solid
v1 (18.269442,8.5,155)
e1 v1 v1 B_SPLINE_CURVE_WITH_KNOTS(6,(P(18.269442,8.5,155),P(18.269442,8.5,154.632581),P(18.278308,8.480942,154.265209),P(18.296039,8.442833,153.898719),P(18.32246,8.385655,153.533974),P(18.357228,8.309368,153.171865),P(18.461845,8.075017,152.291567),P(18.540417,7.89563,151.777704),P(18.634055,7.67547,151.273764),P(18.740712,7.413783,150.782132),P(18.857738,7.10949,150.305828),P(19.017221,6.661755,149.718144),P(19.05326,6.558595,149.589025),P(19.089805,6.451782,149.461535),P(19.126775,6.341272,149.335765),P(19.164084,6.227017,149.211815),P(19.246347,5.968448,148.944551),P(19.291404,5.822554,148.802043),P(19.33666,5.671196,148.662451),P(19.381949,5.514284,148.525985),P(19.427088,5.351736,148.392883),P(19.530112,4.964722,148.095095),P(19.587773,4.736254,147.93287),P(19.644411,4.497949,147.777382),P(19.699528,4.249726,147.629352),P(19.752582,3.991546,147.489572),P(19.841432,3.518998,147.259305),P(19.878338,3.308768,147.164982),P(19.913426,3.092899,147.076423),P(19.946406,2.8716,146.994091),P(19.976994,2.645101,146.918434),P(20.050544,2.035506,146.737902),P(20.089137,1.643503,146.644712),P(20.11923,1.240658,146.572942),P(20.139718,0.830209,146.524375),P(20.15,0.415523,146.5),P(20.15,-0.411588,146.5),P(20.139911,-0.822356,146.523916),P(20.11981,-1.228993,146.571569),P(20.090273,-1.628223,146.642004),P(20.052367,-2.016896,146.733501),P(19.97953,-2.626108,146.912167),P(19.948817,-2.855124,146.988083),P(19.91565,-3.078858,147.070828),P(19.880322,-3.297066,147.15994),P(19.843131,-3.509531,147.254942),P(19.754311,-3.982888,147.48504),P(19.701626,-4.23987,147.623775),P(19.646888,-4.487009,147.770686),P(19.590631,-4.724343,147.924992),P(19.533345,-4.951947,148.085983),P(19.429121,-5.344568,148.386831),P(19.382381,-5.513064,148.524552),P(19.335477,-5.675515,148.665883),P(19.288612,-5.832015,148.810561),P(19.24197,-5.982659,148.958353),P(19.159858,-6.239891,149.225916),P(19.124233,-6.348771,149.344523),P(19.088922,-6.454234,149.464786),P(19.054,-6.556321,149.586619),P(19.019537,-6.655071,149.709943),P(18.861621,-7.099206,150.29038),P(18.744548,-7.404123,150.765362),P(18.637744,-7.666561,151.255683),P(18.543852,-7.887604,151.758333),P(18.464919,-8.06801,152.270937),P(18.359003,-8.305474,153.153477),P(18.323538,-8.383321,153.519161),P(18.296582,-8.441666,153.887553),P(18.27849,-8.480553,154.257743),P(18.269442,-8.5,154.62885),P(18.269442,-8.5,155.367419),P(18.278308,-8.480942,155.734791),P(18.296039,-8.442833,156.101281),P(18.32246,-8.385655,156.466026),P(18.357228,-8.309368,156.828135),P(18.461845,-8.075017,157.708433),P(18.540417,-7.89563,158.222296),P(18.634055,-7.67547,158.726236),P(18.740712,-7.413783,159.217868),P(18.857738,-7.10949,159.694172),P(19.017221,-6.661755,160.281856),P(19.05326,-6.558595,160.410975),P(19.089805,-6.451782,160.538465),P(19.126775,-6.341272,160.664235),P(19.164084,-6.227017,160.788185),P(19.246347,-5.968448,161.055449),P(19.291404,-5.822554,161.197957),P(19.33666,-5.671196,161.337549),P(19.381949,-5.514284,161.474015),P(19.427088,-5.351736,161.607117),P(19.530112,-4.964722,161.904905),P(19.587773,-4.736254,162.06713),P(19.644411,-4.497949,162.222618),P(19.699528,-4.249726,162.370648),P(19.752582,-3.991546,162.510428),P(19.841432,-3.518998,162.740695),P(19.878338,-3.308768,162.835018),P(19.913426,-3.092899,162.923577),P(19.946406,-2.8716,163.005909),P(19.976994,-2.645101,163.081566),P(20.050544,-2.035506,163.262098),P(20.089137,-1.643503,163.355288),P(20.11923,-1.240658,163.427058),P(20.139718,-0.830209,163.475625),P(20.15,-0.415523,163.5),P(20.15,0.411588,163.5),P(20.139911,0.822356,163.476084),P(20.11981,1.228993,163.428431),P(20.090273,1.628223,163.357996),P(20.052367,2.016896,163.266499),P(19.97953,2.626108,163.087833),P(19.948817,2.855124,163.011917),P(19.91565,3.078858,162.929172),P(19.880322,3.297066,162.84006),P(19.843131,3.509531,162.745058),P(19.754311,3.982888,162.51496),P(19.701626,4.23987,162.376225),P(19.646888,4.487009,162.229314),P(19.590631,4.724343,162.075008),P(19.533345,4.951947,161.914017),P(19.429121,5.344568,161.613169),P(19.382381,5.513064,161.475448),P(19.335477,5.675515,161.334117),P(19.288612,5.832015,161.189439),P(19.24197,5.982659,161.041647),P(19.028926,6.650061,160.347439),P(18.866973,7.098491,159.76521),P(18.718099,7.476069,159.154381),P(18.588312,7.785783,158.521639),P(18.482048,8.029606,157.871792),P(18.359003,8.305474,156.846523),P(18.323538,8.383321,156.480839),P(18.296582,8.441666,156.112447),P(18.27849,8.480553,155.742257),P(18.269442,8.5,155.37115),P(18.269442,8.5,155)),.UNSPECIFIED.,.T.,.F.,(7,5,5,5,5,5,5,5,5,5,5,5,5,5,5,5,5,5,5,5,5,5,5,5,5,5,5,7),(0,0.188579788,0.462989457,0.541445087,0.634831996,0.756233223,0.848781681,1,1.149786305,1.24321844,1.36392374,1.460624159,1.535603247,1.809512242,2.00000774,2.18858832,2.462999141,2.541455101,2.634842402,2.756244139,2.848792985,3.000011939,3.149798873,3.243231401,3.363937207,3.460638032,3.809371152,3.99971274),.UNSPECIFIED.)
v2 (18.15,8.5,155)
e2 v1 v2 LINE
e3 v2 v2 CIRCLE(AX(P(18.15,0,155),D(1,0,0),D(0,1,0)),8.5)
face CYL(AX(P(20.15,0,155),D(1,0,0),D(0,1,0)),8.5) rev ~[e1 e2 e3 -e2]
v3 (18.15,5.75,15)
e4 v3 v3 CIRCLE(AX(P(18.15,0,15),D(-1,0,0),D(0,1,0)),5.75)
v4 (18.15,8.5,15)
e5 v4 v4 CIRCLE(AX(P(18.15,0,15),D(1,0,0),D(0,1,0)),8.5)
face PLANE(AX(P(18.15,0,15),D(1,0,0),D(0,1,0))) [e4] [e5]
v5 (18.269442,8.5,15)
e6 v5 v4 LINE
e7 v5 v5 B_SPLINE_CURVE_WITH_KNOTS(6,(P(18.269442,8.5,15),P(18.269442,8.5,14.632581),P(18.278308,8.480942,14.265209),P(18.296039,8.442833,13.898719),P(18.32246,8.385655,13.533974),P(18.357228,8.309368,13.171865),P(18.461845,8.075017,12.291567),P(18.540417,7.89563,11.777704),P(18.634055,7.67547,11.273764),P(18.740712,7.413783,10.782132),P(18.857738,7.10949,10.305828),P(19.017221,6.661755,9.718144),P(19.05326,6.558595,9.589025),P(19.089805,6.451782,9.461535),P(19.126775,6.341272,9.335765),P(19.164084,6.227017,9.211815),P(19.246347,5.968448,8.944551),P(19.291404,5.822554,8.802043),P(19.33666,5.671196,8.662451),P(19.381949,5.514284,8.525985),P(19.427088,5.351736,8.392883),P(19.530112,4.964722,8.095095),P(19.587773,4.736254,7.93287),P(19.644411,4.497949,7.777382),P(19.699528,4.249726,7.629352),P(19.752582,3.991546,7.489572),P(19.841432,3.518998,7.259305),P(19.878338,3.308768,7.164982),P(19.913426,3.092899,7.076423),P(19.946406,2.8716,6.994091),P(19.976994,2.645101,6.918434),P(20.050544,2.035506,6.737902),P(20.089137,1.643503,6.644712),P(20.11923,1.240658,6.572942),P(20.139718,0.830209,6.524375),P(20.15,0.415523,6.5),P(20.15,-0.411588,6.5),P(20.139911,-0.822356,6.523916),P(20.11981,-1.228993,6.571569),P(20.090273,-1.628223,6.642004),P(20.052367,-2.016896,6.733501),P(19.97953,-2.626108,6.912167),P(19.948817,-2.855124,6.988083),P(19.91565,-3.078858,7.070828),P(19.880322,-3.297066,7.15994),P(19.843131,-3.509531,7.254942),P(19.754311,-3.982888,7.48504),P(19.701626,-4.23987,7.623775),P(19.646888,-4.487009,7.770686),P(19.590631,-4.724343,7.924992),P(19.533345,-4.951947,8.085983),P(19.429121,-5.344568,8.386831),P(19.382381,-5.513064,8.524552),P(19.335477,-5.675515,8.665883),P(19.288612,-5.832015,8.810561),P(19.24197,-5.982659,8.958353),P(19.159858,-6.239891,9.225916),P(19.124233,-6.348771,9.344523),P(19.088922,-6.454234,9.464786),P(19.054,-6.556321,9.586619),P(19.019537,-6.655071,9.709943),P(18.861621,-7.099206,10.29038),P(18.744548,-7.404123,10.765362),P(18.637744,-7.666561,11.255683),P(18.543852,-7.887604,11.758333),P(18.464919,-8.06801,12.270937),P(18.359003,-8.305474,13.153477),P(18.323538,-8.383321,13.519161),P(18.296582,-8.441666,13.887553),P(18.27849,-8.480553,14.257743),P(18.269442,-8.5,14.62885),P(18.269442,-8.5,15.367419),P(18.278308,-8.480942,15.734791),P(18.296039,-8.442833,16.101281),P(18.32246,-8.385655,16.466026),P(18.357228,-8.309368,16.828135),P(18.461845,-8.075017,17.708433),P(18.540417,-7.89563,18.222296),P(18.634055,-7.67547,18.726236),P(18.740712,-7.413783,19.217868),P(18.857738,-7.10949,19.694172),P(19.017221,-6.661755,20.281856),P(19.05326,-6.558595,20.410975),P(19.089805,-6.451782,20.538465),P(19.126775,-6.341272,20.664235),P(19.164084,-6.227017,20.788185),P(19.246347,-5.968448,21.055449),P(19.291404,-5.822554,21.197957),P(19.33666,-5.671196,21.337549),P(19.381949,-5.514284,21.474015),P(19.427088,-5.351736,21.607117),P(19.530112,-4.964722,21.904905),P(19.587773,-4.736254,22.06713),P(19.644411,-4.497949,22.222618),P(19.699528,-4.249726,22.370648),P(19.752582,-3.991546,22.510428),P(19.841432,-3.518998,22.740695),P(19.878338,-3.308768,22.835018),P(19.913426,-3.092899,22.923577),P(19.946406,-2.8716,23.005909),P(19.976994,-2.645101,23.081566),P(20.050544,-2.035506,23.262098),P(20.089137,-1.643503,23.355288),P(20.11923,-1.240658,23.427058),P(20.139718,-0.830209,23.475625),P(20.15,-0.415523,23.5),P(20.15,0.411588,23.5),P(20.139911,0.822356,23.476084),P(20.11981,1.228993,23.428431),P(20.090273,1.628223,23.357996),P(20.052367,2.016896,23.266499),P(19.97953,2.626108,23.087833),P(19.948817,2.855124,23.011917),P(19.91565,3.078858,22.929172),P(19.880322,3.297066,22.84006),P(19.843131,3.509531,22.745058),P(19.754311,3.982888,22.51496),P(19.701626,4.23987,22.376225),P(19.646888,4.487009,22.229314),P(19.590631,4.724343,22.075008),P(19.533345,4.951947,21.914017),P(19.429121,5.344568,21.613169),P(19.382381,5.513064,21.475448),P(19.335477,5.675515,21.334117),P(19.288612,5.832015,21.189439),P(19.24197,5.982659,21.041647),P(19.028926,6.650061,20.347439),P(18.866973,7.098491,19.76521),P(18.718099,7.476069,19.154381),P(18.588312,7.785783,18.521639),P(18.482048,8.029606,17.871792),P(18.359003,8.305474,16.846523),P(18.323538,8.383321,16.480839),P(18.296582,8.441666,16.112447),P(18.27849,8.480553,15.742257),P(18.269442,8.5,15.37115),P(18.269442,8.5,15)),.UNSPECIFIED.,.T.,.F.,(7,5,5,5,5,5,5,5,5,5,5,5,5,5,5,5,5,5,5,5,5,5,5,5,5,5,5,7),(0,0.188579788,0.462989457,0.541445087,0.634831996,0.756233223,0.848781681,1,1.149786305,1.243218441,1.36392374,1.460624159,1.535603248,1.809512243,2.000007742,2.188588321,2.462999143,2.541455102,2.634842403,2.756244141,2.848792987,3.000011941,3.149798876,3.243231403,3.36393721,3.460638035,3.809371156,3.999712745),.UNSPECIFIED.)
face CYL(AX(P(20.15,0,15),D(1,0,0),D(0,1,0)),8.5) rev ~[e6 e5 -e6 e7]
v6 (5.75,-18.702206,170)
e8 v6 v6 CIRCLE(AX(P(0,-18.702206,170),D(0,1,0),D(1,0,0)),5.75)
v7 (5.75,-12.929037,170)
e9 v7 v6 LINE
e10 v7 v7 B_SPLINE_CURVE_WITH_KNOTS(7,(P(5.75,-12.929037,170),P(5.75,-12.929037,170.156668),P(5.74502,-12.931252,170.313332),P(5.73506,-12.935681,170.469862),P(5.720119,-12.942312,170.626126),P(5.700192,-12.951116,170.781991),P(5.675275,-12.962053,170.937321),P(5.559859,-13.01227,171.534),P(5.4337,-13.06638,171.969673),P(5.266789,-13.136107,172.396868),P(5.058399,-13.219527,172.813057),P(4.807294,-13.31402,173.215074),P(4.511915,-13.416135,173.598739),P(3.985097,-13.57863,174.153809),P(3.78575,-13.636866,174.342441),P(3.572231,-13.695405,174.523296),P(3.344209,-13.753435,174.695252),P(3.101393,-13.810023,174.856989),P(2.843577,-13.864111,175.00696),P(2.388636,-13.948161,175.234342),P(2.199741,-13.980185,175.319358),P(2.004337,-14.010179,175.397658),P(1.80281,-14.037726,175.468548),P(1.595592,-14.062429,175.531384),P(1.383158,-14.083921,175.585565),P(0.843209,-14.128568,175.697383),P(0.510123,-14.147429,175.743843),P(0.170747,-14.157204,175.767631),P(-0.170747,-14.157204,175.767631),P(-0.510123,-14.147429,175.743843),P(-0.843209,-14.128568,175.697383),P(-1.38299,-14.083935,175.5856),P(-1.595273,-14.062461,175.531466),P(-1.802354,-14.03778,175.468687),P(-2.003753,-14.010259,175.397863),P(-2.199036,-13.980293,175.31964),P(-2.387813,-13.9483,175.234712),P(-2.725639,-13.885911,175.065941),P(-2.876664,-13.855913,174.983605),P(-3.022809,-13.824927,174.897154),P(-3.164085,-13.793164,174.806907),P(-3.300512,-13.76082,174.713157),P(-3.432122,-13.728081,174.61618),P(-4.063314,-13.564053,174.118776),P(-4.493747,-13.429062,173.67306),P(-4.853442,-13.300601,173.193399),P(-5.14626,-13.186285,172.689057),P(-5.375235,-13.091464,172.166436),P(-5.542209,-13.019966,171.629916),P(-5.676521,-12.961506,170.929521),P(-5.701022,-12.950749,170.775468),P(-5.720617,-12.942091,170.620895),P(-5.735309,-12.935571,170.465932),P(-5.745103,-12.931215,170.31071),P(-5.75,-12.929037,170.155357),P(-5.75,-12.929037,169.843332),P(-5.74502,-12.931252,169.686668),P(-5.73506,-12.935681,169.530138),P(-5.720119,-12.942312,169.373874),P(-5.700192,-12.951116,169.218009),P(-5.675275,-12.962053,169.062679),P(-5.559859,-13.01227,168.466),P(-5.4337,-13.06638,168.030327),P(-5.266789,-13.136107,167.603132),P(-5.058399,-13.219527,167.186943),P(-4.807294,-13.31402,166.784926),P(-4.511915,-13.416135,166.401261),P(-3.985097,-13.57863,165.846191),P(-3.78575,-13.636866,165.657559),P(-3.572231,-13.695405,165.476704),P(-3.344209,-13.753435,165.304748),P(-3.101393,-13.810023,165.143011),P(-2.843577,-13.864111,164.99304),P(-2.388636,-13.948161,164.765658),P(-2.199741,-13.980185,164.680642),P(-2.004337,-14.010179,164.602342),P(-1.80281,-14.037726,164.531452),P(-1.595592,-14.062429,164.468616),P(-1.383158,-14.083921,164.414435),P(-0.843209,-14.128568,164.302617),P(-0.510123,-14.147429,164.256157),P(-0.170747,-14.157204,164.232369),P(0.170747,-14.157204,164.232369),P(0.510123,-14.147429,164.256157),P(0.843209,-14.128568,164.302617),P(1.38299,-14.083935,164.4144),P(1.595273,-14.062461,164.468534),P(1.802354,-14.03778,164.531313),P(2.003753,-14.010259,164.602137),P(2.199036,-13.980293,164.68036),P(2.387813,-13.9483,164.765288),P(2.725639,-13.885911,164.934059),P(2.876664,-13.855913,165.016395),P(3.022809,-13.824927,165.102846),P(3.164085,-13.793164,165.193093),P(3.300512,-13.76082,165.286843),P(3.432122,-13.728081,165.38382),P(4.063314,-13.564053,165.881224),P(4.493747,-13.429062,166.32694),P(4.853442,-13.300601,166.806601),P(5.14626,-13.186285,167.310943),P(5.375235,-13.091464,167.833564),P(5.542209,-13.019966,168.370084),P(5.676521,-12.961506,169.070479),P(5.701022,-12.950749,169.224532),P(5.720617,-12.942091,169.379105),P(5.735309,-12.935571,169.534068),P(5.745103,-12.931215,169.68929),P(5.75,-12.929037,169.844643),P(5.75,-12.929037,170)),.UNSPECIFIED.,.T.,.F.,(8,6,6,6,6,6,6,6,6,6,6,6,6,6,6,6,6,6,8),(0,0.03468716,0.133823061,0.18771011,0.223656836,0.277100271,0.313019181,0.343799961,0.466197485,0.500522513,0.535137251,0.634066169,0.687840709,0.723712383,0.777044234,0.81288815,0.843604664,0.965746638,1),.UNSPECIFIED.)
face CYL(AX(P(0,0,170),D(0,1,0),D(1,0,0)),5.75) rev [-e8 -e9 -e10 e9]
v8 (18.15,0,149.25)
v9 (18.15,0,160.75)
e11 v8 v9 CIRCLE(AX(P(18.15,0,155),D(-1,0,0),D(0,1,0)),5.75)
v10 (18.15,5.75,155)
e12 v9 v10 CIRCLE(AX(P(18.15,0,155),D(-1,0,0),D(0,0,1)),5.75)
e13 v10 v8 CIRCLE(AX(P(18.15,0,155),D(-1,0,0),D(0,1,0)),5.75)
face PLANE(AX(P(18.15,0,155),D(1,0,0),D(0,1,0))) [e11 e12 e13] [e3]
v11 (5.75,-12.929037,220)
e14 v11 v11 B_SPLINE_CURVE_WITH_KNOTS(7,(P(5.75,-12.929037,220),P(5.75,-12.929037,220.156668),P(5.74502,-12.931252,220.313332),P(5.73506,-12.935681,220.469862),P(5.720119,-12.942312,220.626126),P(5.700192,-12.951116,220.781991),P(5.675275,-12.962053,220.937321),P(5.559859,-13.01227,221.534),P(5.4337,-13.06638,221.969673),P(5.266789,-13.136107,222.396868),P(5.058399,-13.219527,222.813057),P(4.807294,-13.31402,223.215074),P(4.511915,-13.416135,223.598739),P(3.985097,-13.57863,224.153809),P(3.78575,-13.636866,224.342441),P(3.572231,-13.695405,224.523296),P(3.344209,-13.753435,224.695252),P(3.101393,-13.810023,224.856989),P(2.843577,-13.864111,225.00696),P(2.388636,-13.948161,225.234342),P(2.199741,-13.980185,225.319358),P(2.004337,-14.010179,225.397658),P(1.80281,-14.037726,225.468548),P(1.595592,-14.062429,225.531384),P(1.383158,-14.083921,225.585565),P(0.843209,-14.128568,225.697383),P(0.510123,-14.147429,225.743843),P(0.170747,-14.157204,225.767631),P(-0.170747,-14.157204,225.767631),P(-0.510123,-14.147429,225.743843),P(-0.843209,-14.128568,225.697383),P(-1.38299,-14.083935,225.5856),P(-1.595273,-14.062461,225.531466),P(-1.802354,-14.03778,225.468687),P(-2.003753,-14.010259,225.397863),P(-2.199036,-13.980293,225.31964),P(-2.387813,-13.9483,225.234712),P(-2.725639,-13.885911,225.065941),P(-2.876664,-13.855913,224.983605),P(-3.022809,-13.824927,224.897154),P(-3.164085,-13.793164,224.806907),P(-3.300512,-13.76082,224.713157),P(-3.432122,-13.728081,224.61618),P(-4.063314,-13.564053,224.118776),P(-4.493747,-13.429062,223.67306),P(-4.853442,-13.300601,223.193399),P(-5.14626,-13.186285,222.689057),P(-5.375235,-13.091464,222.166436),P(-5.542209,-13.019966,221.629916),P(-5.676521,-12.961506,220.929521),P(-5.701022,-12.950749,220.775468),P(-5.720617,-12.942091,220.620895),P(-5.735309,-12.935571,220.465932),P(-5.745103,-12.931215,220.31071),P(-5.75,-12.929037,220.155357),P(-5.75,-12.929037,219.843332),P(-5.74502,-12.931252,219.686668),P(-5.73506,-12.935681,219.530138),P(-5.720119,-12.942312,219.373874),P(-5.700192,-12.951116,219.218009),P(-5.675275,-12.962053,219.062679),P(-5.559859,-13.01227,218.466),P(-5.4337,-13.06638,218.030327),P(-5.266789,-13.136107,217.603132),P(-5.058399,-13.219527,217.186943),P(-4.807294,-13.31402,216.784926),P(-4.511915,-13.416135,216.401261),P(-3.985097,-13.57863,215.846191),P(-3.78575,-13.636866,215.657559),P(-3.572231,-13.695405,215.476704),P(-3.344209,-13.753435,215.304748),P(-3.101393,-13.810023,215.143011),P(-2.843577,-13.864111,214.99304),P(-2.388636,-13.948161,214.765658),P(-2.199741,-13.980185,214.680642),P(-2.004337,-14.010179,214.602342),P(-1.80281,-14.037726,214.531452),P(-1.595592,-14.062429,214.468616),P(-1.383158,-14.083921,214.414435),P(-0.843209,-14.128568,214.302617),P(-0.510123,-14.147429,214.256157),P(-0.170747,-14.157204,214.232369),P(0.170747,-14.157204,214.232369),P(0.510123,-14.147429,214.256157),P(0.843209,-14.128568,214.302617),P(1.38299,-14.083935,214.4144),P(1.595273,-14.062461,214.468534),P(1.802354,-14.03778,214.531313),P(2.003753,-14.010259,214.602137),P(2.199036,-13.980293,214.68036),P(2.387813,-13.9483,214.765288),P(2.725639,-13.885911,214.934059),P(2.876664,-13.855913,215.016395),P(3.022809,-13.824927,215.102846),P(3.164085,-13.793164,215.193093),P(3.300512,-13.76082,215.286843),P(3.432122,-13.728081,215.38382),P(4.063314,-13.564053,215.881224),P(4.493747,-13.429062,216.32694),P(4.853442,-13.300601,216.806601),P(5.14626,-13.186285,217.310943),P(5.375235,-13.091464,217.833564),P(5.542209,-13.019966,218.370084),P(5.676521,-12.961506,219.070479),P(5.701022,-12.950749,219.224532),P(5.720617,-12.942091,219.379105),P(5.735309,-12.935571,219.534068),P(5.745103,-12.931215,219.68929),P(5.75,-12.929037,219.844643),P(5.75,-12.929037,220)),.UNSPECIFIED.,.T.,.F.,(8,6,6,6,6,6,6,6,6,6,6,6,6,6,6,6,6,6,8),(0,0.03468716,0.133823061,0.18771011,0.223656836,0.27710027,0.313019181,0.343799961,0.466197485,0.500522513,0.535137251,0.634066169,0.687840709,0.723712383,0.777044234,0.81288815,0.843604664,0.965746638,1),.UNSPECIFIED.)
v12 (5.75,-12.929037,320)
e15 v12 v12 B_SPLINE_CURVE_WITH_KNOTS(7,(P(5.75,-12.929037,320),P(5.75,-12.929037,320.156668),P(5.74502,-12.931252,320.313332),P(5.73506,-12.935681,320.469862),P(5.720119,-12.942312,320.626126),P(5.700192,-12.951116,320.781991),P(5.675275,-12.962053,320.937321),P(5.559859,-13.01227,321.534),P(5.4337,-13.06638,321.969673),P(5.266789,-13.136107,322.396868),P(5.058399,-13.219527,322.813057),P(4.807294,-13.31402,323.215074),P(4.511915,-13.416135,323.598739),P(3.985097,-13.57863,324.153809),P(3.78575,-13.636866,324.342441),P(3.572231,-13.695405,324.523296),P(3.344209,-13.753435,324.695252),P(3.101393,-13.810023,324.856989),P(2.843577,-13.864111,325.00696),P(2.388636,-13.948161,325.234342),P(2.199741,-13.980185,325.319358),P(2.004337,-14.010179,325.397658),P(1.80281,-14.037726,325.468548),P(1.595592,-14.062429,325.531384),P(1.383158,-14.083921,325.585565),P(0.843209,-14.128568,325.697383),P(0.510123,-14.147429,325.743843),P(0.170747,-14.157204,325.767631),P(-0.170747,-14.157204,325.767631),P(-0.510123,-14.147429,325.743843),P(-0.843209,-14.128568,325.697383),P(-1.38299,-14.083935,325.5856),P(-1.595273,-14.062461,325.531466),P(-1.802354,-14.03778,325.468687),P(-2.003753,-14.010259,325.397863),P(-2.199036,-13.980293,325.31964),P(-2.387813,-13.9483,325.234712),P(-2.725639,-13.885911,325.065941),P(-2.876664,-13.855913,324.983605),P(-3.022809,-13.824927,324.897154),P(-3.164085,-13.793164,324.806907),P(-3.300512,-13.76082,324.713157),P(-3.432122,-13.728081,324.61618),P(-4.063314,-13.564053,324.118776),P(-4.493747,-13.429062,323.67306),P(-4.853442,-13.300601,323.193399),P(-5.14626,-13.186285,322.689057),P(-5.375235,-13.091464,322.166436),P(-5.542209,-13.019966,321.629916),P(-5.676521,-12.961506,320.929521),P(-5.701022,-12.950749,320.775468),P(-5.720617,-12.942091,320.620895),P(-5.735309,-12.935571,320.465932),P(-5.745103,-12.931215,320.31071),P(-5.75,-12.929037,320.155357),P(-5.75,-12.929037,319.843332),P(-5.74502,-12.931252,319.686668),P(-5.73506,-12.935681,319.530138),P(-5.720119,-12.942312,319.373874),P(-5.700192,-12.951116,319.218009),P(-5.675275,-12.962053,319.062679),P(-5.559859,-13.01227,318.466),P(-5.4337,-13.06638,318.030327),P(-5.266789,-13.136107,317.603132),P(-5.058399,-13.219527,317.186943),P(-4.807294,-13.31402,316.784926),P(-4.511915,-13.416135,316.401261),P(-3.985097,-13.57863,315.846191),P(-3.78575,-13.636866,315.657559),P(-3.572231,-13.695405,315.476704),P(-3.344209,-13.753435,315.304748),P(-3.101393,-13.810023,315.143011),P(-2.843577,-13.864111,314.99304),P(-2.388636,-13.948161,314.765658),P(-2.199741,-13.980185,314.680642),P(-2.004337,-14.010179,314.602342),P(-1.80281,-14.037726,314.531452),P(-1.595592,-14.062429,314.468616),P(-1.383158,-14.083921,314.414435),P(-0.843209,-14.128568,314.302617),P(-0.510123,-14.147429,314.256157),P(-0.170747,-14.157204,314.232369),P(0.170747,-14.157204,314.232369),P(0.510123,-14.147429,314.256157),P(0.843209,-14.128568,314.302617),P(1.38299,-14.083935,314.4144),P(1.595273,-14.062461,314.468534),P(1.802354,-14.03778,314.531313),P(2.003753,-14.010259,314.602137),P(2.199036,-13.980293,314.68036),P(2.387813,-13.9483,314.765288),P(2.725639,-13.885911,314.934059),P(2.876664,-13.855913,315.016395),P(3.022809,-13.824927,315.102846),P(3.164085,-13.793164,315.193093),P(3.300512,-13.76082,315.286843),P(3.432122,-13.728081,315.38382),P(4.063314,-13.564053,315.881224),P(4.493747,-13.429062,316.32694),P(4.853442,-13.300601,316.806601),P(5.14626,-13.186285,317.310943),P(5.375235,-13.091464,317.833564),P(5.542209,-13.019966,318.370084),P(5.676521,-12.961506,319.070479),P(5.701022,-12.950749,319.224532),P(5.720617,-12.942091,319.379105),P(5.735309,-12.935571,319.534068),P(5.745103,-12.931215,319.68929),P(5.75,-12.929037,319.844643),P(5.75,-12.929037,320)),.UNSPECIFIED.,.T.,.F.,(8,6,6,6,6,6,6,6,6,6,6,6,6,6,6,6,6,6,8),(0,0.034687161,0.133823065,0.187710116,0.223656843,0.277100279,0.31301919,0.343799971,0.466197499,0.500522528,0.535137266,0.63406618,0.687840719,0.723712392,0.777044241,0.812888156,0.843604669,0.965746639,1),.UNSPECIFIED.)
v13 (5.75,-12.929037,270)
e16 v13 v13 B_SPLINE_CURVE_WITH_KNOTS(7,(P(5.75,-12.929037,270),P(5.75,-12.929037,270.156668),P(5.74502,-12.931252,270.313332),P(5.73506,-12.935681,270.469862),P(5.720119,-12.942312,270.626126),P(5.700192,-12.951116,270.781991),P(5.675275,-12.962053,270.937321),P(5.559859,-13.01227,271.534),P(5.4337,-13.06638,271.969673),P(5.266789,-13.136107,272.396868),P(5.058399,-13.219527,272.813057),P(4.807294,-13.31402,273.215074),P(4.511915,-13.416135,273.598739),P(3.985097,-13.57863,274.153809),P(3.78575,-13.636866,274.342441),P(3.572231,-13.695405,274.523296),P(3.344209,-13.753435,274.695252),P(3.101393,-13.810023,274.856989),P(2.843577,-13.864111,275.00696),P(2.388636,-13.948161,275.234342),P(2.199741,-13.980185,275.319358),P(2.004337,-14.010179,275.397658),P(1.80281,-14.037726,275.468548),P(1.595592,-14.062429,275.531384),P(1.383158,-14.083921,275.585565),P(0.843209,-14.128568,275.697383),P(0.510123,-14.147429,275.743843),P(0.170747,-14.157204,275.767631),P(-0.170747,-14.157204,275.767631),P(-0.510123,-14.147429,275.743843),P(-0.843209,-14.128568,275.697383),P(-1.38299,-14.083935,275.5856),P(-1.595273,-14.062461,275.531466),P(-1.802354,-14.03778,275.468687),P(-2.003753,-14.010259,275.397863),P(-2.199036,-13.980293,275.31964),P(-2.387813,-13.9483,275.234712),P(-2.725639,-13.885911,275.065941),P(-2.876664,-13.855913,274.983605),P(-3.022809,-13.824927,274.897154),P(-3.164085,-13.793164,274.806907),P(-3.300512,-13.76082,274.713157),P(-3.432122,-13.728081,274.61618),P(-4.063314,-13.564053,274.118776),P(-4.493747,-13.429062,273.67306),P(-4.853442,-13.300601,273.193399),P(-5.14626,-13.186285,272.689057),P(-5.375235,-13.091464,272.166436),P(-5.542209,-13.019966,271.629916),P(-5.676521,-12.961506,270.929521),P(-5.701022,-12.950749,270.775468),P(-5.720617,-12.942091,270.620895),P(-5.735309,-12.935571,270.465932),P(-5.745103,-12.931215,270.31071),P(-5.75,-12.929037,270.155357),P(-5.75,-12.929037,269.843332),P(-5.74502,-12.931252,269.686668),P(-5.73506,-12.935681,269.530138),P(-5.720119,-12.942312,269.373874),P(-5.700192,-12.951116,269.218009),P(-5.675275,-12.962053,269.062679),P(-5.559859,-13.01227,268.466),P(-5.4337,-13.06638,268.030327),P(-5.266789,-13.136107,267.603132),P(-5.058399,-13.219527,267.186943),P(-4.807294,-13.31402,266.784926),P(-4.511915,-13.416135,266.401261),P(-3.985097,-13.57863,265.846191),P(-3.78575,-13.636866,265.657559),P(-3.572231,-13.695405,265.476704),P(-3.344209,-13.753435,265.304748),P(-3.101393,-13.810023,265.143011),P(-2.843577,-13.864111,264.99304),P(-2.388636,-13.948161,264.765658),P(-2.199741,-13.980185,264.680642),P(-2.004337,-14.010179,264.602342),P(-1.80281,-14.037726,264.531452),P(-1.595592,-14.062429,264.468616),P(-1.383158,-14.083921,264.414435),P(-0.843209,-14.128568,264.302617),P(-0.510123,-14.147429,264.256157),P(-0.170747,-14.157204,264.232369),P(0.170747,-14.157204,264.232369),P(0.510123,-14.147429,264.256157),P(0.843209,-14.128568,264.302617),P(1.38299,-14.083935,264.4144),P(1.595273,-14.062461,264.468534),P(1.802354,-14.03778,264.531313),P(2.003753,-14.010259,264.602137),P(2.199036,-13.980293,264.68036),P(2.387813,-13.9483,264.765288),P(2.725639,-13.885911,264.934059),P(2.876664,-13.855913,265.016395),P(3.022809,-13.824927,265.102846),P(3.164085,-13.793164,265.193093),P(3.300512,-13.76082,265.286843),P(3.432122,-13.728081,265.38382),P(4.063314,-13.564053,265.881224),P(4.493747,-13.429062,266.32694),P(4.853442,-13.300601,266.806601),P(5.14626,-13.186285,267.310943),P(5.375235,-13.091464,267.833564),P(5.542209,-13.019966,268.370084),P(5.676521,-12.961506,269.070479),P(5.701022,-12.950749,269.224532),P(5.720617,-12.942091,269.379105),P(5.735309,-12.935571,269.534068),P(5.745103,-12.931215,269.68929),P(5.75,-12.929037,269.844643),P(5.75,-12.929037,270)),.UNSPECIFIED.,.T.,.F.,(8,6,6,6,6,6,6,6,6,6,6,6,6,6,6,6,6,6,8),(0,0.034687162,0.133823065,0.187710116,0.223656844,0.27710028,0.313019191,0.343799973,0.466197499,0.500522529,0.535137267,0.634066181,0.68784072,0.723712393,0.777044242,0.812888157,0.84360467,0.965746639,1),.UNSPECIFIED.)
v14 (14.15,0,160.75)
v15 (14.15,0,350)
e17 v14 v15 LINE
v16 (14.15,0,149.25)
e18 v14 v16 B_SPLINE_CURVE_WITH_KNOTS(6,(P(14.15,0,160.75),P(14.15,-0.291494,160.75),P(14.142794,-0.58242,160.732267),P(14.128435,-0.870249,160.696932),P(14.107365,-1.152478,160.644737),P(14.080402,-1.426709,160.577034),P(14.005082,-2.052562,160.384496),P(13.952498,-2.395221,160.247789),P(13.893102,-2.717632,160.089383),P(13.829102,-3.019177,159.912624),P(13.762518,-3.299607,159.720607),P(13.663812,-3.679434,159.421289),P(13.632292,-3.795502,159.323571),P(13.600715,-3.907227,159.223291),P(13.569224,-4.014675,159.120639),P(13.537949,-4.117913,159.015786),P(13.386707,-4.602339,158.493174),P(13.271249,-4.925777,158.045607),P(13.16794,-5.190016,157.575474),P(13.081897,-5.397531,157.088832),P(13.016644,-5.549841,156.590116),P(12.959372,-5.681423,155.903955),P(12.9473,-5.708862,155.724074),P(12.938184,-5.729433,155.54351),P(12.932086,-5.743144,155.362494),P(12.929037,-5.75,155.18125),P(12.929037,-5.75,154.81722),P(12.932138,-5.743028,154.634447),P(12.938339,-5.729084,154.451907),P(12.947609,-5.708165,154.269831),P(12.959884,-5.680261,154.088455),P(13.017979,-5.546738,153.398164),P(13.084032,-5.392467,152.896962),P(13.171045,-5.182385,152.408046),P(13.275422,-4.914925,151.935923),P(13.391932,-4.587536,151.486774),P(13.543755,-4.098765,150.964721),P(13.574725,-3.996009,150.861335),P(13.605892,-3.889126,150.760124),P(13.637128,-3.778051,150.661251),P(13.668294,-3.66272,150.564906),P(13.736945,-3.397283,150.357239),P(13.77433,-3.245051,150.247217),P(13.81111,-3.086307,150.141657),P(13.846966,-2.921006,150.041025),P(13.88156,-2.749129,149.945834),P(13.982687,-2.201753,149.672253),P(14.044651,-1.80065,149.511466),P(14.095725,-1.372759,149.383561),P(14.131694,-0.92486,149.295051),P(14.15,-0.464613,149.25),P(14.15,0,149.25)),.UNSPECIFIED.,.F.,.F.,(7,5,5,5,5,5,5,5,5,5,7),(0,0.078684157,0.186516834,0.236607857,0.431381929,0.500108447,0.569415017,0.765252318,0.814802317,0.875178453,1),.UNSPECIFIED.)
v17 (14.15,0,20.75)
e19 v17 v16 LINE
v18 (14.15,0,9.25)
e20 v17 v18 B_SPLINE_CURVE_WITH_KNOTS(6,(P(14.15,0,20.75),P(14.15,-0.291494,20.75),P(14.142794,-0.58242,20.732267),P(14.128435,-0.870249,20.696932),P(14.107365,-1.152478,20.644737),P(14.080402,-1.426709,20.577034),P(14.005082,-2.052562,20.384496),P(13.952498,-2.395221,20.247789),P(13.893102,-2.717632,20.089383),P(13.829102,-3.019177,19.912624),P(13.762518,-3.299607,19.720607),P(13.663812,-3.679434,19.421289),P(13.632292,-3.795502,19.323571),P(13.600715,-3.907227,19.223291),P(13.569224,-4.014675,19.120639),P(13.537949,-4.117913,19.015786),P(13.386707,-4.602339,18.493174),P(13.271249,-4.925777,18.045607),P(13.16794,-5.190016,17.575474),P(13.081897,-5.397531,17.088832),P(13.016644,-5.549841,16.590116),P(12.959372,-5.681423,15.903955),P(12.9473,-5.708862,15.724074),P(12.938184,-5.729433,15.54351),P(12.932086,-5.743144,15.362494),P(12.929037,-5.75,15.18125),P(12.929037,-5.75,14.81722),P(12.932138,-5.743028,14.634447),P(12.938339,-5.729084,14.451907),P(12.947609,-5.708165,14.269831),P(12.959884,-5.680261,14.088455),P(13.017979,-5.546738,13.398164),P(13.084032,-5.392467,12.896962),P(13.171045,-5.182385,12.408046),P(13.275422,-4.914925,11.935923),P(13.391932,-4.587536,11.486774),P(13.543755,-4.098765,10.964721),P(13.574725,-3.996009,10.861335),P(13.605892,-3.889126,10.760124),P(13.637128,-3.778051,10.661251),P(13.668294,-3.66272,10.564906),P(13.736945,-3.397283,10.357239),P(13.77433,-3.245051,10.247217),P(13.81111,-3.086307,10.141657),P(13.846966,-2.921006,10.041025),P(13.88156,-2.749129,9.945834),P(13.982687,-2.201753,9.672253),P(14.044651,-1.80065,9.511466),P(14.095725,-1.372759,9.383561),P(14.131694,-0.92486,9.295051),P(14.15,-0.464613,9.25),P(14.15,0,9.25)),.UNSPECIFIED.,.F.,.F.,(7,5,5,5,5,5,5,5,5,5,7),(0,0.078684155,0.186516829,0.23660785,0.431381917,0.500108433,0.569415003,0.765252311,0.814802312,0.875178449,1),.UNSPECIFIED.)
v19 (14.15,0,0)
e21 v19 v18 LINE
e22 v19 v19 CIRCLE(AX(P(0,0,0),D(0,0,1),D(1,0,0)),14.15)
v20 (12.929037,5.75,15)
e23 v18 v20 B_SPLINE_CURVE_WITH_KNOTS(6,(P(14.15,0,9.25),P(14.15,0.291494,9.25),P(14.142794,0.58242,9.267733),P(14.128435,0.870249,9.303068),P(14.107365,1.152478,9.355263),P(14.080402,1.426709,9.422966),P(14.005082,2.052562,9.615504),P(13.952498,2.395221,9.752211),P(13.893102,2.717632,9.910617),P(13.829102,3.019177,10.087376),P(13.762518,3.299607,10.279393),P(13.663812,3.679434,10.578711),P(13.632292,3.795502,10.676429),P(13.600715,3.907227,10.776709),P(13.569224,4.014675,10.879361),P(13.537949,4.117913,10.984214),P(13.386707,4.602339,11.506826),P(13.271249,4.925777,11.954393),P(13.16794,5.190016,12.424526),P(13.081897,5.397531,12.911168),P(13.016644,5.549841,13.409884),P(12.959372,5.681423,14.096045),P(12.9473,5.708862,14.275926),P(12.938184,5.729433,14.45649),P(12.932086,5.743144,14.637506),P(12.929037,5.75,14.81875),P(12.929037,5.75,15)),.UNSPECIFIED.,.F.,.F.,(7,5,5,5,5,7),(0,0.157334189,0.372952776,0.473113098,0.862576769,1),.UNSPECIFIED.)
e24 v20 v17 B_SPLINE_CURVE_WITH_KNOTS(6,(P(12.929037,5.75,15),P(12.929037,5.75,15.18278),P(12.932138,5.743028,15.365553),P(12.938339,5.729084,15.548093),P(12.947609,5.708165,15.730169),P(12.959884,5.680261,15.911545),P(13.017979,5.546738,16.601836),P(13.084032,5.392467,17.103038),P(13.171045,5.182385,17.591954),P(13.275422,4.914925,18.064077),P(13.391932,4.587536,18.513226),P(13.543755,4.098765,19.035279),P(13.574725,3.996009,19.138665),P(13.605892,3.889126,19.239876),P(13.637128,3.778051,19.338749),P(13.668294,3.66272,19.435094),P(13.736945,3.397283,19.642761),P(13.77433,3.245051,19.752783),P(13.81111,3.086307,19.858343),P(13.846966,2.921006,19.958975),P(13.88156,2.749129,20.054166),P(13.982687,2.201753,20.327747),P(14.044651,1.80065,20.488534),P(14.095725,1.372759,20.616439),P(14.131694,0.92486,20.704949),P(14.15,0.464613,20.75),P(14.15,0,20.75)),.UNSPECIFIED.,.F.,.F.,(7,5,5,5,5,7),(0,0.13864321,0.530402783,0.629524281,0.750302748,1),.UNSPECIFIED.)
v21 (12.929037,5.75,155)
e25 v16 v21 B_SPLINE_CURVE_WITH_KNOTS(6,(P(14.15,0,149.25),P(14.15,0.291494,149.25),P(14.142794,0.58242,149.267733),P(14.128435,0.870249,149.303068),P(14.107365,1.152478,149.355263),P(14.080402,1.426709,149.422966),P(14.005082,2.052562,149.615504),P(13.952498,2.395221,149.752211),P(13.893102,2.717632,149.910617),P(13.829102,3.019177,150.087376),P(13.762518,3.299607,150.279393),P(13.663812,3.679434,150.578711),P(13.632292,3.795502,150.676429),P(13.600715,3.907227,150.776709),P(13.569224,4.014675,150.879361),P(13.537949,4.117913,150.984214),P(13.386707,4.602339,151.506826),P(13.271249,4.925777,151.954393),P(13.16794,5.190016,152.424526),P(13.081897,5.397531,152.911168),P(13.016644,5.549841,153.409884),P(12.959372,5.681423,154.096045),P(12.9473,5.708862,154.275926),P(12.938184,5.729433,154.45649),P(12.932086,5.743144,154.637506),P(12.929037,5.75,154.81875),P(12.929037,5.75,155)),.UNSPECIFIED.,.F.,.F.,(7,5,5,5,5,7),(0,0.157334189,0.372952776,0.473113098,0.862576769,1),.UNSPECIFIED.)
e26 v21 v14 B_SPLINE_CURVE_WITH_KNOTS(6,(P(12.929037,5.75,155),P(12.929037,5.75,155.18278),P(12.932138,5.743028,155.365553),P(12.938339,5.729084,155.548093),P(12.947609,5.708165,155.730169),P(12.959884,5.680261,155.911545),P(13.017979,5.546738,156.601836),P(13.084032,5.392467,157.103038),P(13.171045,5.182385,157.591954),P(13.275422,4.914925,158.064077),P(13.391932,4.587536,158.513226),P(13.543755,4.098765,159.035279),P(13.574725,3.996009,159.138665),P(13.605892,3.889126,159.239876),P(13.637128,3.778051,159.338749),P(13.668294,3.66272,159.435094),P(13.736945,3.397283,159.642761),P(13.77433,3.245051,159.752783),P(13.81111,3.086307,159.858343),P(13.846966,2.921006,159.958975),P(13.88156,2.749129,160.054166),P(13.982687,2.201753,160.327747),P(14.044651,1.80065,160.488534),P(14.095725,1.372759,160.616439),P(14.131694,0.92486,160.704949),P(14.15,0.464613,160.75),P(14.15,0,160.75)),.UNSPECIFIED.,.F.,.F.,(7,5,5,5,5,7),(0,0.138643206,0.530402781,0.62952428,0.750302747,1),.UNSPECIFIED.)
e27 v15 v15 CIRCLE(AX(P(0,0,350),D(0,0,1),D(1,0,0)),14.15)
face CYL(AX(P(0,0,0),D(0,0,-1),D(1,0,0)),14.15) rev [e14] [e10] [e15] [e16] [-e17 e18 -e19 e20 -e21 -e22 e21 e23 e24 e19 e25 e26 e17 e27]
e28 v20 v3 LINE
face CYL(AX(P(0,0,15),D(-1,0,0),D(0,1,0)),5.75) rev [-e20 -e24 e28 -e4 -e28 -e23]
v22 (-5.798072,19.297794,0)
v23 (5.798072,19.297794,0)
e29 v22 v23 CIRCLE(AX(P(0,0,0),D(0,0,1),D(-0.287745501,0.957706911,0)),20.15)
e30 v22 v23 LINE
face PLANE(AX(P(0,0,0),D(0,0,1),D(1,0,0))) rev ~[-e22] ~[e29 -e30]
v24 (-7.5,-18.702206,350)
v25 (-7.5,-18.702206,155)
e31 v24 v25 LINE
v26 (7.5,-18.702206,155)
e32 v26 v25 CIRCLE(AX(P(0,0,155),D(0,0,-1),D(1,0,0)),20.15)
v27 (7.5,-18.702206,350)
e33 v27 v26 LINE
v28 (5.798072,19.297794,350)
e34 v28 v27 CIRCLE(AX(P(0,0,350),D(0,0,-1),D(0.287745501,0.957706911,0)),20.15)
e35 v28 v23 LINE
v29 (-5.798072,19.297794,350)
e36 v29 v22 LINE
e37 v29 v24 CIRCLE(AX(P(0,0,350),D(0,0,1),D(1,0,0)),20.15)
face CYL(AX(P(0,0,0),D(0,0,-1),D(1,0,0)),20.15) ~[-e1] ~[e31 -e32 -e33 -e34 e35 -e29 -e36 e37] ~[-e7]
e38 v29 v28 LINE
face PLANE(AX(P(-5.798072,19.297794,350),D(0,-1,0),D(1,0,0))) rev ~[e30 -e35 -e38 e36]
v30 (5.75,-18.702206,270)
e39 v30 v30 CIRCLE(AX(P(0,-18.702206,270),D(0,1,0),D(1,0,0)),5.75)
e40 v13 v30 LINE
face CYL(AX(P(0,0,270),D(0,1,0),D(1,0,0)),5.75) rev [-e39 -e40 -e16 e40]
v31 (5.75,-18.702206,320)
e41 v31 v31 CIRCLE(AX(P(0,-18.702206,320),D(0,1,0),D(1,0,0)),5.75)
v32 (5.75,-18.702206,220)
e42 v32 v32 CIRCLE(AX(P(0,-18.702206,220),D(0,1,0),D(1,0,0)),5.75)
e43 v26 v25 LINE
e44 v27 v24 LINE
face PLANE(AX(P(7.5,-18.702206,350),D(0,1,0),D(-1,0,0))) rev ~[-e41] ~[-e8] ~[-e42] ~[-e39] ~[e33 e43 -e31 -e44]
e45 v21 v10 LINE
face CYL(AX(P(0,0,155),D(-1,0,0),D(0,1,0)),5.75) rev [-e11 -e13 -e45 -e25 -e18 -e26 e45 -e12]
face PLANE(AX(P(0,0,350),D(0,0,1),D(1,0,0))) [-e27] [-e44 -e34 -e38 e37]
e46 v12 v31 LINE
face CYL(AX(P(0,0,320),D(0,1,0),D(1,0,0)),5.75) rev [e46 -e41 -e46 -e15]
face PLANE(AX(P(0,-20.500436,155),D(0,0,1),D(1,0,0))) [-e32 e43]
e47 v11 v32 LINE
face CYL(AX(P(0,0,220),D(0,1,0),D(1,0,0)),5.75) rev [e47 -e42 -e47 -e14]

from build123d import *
from build123d import SkipClean  # not in build123d's __all__

# Parameters (mm, degrees)
F0_R      = 20.15
F0_R_2    = 14.15
F1_DEPTH  = 350
F2_R      = 5.75
F3_DEPTH  = 25
F5_DEPTH  = 195
F6_DEPTH  = 350.0010001
F7_R      = 5.75
F8_DEPTH  = 20.15
F9_R      = 8.5
F10_DEPTH = 2
F11_DEPTH = 25


with BuildPart() as f1:
    # F0 (on Top) → F1 (new body)
    with BuildSketch(Plane.XY):
        Circle(F0_R)
        Circle(F0_R_2, mode=Mode.SUBTRACT)
    extrude(amount=F1_DEPTH)

    # F2 (on Front) → F3 (cut)
    with BuildSketch(Plane.XZ):
        with Locations((0, 320)):
            Circle(F2_R)
        with Locations((0, 270)):
            Circle(F2_R)
        with Locations((0, 220)):
            Circle(F2_R)
        with Locations((0, 170)):
            Circle(F2_R)
    extrude(amount=F3_DEPTH, mode=Mode.SUBTRACT)

    # F4 (on face) → F5 (cut)
    with BuildSketch(Plane.XY.offset(350)):
        with BuildLine():
            Line((-7.5, -21.5977942477), (7.5, -21.5977942477))
            Line((7.5, -21.5977942477), (7.5, -18.7022057523))
            ThreePointArc((7.5, -18.7022057523), (0, -20.15), (-7.5, -18.7022057523))
            Line((-7.5, -18.7022057523), (-7.5, -21.5977942477))
        make_face()
        with BuildLine():
            ThreePointArc((-7.5, -18.7022057523), (0, -20.15), (7.5, -18.7022057523))
            Line((7.5, -18.7022057523), (-7.5, -18.7022057523))
        make_face()
    extrude(amount=-F5_DEPTH, mode=Mode.SUBTRACT)

    # F4 (on face) → F6 (cut, through all)
    with BuildSketch(Plane.XY.offset(350)):
        with BuildLine():
            ThreePointArc((5.7980718495, 19.2977942477), (0, 20.15), (-5.7980718495, 19.2977942477))
            Line((-5.7980718495, 19.2977942477), (5.7980718495, 19.2977942477))
        make_face()
    extrude(amount=-F6_DEPTH, mode=Mode.SUBTRACT)

    # F7 (on Right) → F8 (join)
    with BuildSketch(Plane.YZ):
        with Locations((0, 15)):
            Circle(F7_R)
        with Locations((0, 155)):
            Circle(F7_R)
    with SkipClean():  # cleaning this boolean's faces spoils the solid; the shape is the same uncleaned
        extrude(amount=F8_DEPTH)

    # F9 (on face) → F10 (cut)
    with BuildSketch(Plane.YZ.offset(20.15)):
        with Locations((0, 155)):
            Circle(F9_R)
        with BuildLine():
            ThreePointArc((5.75, 155), (4.0658639918, 150.9341360082), (0, 149.25))
            ThreePointArc((0, 149.25), (-5.75, 155), (0, 160.75))
            ThreePointArc((0, 160.75), (4.0658639918, 159.0658639918), (5.75, 155))
        make_face(mode=Mode.SUBTRACT)
        with BuildLine():
            ThreePointArc((0, 160.75), (-5.75, 155), (0, 149.25))
            Line((0, 149.25), (0, 160.75))
        make_face()
        with Locations((0, 15)):
            Circle(F9_R)
    with SkipClean():  # cleaning this boolean's faces spoils the solid; the shape is the same uncleaned
        extrude(amount=-F10_DEPTH, mode=Mode.SUBTRACT)

    # F7 (on Right) → F11 (cut)
    with BuildSketch(Plane.YZ):
        with Locations((0, 15)):
            Circle(F7_R)
        with Locations((0, 155)):
            Circle(F7_R)
    extrude(amount=F11_DEPTH, mode=Mode.SUBTRACT)


solid = f1.part
